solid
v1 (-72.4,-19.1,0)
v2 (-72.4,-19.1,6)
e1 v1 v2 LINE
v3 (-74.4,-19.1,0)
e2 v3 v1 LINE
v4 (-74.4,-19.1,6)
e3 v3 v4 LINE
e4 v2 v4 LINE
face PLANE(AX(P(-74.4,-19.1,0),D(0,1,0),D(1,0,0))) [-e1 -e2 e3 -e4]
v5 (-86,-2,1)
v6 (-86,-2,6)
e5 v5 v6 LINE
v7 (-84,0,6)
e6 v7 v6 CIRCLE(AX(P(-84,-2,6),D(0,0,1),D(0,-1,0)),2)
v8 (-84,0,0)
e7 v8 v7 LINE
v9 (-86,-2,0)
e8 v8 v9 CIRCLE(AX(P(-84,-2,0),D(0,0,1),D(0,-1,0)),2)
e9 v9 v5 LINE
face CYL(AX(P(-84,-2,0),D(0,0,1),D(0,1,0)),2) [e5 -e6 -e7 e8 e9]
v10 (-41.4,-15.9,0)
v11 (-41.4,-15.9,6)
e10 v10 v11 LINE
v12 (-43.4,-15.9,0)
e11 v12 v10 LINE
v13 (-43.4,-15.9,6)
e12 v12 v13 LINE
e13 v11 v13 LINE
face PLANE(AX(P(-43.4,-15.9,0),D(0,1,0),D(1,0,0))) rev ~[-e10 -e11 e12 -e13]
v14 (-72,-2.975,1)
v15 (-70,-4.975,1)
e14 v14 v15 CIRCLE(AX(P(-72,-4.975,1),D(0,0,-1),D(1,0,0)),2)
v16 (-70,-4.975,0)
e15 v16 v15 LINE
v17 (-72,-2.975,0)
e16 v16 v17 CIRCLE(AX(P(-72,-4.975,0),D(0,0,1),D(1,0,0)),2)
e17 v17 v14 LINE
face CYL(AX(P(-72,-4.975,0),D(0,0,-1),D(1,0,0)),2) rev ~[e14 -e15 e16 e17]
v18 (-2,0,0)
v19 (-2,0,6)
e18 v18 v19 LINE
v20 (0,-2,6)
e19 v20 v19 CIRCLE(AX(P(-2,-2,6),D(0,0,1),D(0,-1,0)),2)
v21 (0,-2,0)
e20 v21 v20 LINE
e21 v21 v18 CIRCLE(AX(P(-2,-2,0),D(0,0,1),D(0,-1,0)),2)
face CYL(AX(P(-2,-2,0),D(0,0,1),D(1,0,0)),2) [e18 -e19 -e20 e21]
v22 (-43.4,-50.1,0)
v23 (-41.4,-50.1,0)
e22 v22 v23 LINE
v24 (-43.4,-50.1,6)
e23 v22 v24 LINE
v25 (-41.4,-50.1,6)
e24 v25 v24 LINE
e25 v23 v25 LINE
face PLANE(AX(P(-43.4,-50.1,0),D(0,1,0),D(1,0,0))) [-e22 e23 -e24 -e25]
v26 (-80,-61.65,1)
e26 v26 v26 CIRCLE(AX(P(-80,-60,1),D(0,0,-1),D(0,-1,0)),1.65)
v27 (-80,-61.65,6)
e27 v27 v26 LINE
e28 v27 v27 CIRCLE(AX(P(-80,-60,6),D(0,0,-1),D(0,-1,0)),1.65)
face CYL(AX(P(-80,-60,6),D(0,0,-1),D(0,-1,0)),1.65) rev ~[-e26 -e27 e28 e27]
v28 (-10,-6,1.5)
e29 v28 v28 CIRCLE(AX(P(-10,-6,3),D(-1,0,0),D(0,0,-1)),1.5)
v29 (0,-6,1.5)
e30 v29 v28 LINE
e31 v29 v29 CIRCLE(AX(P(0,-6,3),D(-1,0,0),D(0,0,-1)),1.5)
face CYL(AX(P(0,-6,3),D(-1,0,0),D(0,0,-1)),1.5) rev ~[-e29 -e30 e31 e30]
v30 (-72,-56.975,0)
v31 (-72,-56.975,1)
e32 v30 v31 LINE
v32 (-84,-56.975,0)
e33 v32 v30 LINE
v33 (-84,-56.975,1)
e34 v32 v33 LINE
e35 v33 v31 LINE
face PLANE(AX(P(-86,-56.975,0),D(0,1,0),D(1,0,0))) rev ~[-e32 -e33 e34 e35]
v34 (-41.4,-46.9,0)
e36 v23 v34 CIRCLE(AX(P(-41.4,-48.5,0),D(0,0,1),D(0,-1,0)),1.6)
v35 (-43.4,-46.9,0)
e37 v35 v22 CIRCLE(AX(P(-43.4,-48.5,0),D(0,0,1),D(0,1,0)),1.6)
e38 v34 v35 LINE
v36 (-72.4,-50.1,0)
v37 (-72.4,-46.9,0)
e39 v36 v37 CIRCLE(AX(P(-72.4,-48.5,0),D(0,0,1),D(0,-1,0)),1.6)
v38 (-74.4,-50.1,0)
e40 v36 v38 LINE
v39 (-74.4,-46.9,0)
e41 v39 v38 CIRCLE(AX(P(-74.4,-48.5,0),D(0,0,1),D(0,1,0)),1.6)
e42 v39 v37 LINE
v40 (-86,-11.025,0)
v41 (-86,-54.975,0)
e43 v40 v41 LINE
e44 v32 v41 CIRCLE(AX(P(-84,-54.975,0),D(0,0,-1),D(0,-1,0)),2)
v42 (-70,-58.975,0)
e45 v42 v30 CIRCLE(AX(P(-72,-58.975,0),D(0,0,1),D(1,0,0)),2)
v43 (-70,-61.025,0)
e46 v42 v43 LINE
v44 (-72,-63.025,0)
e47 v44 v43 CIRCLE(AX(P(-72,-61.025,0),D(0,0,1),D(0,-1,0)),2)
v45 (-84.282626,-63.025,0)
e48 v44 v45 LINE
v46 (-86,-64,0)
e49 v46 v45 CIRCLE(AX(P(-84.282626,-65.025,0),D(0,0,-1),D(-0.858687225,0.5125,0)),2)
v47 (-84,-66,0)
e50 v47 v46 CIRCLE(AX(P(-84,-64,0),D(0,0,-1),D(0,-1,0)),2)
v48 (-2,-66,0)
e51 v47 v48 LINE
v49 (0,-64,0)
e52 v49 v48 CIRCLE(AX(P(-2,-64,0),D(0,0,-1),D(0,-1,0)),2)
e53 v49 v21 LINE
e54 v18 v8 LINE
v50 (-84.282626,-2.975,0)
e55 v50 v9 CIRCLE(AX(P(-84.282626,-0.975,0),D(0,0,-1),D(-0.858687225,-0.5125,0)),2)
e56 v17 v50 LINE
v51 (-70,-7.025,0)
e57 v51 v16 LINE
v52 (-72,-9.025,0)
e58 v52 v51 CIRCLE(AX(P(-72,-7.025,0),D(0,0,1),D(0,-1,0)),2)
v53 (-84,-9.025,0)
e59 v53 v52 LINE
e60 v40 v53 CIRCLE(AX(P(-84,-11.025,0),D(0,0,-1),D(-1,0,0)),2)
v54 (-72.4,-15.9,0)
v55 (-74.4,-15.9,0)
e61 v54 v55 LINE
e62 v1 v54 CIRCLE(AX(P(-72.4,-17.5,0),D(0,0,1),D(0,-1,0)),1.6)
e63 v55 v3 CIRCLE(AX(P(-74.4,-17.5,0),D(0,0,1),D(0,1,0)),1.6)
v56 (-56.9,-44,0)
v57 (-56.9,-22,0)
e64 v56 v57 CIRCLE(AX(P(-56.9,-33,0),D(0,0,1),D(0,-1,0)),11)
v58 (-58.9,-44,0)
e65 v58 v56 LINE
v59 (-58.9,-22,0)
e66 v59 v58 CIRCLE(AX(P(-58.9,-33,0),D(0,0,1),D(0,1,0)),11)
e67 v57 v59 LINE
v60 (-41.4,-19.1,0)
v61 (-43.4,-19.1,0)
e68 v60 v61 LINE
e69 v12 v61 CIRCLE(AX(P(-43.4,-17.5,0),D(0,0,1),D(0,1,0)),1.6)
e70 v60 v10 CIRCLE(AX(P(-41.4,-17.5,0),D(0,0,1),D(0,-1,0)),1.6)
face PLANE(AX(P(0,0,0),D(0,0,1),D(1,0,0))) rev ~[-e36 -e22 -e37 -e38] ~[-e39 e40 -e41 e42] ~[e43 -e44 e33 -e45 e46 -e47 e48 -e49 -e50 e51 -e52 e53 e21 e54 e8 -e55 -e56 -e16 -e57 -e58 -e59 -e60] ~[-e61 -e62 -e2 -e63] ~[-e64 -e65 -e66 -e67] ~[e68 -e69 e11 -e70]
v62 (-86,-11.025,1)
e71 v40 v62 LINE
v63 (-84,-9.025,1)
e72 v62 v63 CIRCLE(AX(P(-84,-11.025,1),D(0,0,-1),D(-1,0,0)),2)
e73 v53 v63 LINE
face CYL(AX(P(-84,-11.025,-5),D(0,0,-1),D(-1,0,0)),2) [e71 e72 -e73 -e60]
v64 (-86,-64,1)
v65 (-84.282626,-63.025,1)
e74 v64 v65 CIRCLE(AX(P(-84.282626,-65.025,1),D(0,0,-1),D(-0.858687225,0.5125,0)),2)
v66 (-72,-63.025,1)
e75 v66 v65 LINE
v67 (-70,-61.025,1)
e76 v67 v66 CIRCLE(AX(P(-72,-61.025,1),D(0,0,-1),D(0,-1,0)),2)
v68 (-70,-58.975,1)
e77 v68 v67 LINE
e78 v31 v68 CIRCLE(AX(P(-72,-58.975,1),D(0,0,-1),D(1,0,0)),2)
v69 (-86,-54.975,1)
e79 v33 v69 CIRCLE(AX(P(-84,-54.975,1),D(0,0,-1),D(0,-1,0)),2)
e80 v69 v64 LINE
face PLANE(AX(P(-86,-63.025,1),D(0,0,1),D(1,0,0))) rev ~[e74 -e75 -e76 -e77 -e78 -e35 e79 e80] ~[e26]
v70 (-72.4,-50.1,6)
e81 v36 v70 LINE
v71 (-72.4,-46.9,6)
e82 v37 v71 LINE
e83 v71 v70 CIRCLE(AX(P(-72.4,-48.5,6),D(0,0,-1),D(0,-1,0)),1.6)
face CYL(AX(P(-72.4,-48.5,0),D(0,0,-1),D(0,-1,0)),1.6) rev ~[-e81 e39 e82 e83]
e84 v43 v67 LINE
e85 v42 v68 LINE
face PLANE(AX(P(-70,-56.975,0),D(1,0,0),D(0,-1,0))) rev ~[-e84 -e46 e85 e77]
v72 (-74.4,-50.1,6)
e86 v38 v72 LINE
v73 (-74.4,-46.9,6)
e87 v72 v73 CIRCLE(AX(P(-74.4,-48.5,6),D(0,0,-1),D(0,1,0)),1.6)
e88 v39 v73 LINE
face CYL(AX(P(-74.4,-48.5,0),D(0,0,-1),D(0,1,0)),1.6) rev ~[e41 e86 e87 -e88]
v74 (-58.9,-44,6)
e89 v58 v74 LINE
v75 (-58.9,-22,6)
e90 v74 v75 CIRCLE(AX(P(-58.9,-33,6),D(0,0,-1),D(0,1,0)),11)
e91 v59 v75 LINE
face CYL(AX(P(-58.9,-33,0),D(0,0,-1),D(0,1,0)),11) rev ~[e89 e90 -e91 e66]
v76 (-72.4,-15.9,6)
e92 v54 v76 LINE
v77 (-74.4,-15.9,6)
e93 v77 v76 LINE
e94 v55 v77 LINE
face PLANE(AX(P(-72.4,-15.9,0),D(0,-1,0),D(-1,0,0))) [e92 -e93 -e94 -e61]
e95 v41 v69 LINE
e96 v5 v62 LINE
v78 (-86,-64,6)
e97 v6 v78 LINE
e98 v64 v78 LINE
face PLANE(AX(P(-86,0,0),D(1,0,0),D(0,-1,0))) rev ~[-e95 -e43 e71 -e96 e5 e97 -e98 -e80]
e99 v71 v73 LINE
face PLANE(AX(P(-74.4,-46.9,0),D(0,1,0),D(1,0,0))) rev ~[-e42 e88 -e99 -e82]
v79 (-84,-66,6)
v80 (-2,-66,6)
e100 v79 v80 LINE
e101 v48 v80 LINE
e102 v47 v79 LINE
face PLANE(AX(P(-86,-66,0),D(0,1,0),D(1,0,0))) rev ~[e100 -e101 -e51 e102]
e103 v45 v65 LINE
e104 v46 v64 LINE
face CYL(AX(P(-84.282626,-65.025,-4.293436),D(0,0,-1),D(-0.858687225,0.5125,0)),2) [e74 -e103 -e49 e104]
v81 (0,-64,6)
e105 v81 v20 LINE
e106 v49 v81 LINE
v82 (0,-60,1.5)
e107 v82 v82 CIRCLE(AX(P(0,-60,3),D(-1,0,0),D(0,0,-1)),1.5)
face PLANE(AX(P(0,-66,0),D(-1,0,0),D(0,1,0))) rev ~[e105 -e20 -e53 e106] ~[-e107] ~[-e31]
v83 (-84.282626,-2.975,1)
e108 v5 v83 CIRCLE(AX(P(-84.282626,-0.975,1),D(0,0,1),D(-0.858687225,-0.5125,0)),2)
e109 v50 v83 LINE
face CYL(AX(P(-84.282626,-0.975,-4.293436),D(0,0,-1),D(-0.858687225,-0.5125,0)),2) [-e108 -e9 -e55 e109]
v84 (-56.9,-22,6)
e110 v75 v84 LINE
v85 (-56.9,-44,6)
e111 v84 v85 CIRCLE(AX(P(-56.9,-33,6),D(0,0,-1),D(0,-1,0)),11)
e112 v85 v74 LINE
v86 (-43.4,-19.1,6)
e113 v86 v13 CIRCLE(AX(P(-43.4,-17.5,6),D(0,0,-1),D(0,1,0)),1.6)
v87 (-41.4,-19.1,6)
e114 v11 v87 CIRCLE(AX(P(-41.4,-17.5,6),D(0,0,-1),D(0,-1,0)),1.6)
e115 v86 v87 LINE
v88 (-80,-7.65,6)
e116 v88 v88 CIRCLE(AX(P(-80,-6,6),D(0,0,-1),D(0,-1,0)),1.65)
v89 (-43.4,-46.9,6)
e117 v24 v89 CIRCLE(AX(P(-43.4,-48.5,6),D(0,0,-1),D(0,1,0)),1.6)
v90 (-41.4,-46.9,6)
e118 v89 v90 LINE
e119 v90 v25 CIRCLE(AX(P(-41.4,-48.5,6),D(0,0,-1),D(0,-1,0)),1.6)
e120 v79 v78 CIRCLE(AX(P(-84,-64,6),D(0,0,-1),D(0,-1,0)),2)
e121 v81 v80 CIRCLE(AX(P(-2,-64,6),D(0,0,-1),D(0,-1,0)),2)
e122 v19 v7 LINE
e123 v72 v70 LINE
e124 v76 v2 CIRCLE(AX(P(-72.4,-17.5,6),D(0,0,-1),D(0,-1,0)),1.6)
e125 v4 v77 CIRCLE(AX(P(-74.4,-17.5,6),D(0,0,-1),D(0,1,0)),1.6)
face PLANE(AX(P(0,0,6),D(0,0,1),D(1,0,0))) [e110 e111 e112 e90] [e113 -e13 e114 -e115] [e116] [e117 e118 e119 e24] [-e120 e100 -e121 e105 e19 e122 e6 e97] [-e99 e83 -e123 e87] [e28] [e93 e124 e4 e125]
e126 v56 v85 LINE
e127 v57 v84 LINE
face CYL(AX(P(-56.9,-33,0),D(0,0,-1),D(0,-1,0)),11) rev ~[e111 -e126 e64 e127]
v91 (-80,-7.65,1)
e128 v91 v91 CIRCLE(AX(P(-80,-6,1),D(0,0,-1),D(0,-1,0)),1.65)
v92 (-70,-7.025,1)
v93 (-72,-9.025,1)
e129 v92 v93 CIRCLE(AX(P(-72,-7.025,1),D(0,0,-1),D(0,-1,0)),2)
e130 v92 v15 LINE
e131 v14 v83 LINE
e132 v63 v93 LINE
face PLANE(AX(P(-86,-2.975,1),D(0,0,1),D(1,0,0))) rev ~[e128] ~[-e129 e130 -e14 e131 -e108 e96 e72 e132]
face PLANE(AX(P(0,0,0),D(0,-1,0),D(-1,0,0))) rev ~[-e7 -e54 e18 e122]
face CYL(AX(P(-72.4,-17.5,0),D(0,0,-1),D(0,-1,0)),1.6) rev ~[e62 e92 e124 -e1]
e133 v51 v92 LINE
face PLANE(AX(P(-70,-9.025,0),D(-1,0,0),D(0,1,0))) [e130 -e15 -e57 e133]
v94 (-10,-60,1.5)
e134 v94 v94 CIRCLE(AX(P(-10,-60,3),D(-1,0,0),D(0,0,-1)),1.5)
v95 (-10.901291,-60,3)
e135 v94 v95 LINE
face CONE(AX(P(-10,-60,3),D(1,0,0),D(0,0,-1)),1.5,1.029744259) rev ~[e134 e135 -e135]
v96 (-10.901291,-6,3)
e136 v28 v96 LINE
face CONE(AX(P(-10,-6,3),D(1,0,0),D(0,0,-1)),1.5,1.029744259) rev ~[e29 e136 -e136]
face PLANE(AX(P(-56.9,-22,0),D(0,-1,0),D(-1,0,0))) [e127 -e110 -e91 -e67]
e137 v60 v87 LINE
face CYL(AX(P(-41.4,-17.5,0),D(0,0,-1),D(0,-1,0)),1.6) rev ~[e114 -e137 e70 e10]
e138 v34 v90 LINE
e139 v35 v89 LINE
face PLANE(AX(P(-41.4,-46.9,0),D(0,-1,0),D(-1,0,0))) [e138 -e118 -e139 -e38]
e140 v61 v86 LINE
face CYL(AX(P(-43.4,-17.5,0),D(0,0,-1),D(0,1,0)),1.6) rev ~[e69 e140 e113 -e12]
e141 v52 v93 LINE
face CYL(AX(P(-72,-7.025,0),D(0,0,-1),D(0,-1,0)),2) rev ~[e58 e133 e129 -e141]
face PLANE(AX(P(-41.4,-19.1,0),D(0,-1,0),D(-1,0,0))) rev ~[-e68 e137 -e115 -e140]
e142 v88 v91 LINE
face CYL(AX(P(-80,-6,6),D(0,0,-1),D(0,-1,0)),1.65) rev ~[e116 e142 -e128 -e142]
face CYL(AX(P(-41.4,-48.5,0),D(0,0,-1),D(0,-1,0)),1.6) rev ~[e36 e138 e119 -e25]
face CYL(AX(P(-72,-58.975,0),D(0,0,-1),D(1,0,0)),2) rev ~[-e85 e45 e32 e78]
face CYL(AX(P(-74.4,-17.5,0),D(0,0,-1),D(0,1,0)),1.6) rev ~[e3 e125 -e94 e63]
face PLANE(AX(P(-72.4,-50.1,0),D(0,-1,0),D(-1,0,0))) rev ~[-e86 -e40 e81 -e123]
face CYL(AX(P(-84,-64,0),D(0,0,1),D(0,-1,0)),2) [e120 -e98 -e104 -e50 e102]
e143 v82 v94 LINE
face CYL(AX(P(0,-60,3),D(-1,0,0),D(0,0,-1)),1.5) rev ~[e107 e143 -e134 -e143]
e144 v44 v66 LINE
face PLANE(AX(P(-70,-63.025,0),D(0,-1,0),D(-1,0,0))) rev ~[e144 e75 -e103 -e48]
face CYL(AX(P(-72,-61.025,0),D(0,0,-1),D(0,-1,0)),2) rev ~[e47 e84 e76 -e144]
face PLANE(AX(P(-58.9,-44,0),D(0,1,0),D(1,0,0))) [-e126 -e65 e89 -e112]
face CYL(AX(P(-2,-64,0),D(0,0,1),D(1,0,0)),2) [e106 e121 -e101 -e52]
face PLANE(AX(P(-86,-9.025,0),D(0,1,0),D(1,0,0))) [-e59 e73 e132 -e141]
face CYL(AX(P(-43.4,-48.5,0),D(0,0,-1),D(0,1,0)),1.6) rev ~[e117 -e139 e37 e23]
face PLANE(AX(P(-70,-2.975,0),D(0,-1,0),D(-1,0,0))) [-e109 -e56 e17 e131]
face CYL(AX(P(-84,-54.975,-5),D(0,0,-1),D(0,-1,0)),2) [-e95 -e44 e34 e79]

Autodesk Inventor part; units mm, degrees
ref_plane "YZ Plane" through (0, 0, 0) normal (1, 0, 0) x (0, 1, 0)
sketch "Skizze3" plane through (0, 0, 0) normal (0, 0, 1) x (1, 0, 0)
  line L0 (0, 0) -> (-86, 0)
  line L1 (-86, 0) -> (-86, -66)
  line L2 (-86, -66) -> (0, -66)
  line L3 (0, -66) -> (0, 0)
  line L4 (-57.9, -33) -> (-86, -33) construction
  line L5 (-42.4, -48.5) -> (-73.4, -48.5) construction
  line L6 (-74.4, -48.5) -> (-72.4, -48.5) construction
  line L7 (-74.4, -46.9) -> (-72.4, -46.9)
  line L8 (-72.4, -50.1) -> (-74.4, -50.1)
  arc A0 (-74.4, -46.9) -> (-74.4, -50.1) centre (-74.4, -48.5) ccw
  arc A1 (-72.4, -50.1) -> (-72.4, -46.9) centre (-72.4, -48.5) ccw
  line L9 (-43.4, -48.5) -> (-41.4, -48.5) construction
  line L10 (-43.4, -50.1) -> (-41.4, -50.1)
  line L11 (-41.4, -46.9) -> (-43.4, -46.9)
  arc A2 (-43.4, -46.9) -> (-43.4, -50.1) centre (-43.4, -48.5) ccw
  arc A3 (-41.4, -50.1) -> (-41.4, -46.9) centre (-41.4, -48.5) ccw
  line L12 (-74.4, -19.1) -> (-72.4, -19.1)
  line L13 (-72.4, -15.9) -> (-74.4, -15.9)
  arc A4 (-74.4, -15.9) -> (-74.4, -19.1) centre (-74.4, -17.5) ccw
  arc A5 (-72.4, -19.1) -> (-72.4, -15.9) centre (-72.4, -17.5) ccw
  line L14 (-43.4, -15.9) -> (-41.4, -15.9)
  line L15 (-41.4, -19.1) -> (-43.4, -19.1)
  arc A6 (-43.4, -15.9) -> (-43.4, -19.1) centre (-43.4, -17.5) ccw
  arc A7 (-41.4, -19.1) -> (-41.4, -15.9) centre (-41.4, -17.5) ccw
  line L16 (-58.9, -33) -> (-56.9, -33) construction
  line L17 (-58.9, -44) -> (-56.9, -44)
  line L18 (-56.9, -22) -> (-58.9, -22)
  arc A8 (-58.9, -22) -> (-58.9, -44) centre (-58.9, -33) ccw
  arc A9 (-56.9, -44) -> (-56.9, -22) centre (-56.9, -33) ccw
  point P0 (-57.9, -48.5)
  dimension "d4" = 86
  dimension "d5" = 66
  dimension "d44" = 31
  dimension "d53" = 28.1
  dimension "d54" = 15.5
  dimension "d55" = 1.6
  dimension "d56" = 2
  dimension "d57" = 1.6
  dimension "d58" = 2
  dimension "d59" = 2
  dimension "d60" = 11
extrude "Extrusion3" add sketch "Skizze3" along normal blind 6 contours L3 L2 L1 L0 | L7 A1 L8 A0 | A2 L11 A3 L10 | A4 L13 A5 L12 | L14 A7 L15 A6 | A8 L18 A9 L17
sketch "Skizze4" plane through (0, -66, 0) normal (1, 0, 0) x (0, 0, -1)
  line L0 (0, 0) -> (-6, 0) projected
  line L1 (-3, 0) -> (-3, 70) construction
  line L2 (0, 66) -> (0, 0) projected
  line L3 (0, 66) -> (-6, 66) projected
  point P0 (-3, 60)
  point P1 (-3, 6)
  dimension "d10" = 6
  dimension "d11" = 6
hole "Bohrung1" at (0, -6, 3) at (0, -60, 3) direction (-1, 0, 0) diameter 3 depth 10 tip angle 118
thread "Gewinde2" size "M3x0.5" class "6H" standard "ISO Metric profile" length 8
thread "Gewinde3" size "M3x0.5" class "6H" standard "ISO Metric profile" length 8
sketch "Skizze5" plane through (0, 0, 6) normal (0, 0, 1) x (1, 0, 0)
  line L0 (0, -60) -> (-86, -60) construction
  line L1 (-86, 0) -> (-86, -66) projected
  line L2 (-70, -63.025) -> (-86, -63.025)
  line L3 (-86, -63.025) -> (-86, -56.975)
  line L4 (-86, -56.975) -> (-70, -56.975)
  line L5 (-70, -56.975) -> (-70, -63.025)
  line L6 (0, -66) -> (0, 0) projected
  line L7 (0, -33) -> (-86, -33) construction
  line L8 (-70, -2.975) -> (-86, -2.975)
  line L9 (-86, -2.975) -> (-86, -9.025)
  line L10 (-86, -9.025) -> (-70, -9.025)
  line L11 (-70, -9.025) -> (-70, -2.975)
  point P0 (0, -6)
  point P1 (-80, -60)
  point P2 (-70, -60)
  point P3 (-80, -6)
  point P4 (-86, -2.975)
  point P5 (-86, -9.025)
  dimension "d26" = 6
  dimension "d34" = 16
  dimension "d35" = 6.05
hole "Bohrung2" at (-80, -60, 6) at (-80, -6, 6) direction (0, 0, -1) diameter 3.3 depth 8.1
sketch "Skizze6" plane through (0, 0, 0) normal (0, 0, -1) x (-1, 0, 0)
  line L0 (86, -9.025) -> (70, -9.025) projected
  line L1 (70, -9.025) -> (70, -2.975) projected
  line L2 (70, -2.975) -> (86, -2.975) projected
  line L3 (86, -56.975) -> (70, -56.975) projected
  line L4 (70, -63.025) -> (86, -63.025) projected
  line L5 (70, -56.975) -> (70, -63.025) projected
  line L6 (86, 0) -> (86, -66) projected
  point P0 (0, 0)
  point P1 (80, -6)
extrude "Extrusion5" cut sketch "Skizze6" against normal blind 1
fillet "Rundung3" radius 2 4 edges at (0, -66, 3) (0, 0, 3) (-86, -66, 3) (-86, 0, 3)
fillet "Rundung4" radius 2 8 edges at (-86, -2.975, 0.5) (-86, -9.025, 0.5) (-70, -2.975, 0.5) (-70, -9.025, 0.5) (-86, -56.975, 0.5) (-86, -63.025, 0.5) (-70, -56.975, 0.5) (-70, -63.025, 0.5)
extrude "Extrusion6" cut sketch "Skizze3" along normal blind 10 contours L7 A1 L8 A0 | A2 L11 A3 L10 | A4 L13 A5 L12 | L14 A7 L15 A6 | A8 L18 A9 L17
ref_plane "Arbeitsebene1" through (-73.4, -48.5, 0) normal (-1, 0, 0) x (0, 0, 1)
ref_plane "Arbeitsebene2" through (-42.4, -48.5, 0) normal (-1, 0, 0) x (0, 0, 1)
equation "\"d54\" = 0.5 * d44"
equation "\"d57\" = d55"
properties part number "BT901_goteln20_23" material "Acryl"
